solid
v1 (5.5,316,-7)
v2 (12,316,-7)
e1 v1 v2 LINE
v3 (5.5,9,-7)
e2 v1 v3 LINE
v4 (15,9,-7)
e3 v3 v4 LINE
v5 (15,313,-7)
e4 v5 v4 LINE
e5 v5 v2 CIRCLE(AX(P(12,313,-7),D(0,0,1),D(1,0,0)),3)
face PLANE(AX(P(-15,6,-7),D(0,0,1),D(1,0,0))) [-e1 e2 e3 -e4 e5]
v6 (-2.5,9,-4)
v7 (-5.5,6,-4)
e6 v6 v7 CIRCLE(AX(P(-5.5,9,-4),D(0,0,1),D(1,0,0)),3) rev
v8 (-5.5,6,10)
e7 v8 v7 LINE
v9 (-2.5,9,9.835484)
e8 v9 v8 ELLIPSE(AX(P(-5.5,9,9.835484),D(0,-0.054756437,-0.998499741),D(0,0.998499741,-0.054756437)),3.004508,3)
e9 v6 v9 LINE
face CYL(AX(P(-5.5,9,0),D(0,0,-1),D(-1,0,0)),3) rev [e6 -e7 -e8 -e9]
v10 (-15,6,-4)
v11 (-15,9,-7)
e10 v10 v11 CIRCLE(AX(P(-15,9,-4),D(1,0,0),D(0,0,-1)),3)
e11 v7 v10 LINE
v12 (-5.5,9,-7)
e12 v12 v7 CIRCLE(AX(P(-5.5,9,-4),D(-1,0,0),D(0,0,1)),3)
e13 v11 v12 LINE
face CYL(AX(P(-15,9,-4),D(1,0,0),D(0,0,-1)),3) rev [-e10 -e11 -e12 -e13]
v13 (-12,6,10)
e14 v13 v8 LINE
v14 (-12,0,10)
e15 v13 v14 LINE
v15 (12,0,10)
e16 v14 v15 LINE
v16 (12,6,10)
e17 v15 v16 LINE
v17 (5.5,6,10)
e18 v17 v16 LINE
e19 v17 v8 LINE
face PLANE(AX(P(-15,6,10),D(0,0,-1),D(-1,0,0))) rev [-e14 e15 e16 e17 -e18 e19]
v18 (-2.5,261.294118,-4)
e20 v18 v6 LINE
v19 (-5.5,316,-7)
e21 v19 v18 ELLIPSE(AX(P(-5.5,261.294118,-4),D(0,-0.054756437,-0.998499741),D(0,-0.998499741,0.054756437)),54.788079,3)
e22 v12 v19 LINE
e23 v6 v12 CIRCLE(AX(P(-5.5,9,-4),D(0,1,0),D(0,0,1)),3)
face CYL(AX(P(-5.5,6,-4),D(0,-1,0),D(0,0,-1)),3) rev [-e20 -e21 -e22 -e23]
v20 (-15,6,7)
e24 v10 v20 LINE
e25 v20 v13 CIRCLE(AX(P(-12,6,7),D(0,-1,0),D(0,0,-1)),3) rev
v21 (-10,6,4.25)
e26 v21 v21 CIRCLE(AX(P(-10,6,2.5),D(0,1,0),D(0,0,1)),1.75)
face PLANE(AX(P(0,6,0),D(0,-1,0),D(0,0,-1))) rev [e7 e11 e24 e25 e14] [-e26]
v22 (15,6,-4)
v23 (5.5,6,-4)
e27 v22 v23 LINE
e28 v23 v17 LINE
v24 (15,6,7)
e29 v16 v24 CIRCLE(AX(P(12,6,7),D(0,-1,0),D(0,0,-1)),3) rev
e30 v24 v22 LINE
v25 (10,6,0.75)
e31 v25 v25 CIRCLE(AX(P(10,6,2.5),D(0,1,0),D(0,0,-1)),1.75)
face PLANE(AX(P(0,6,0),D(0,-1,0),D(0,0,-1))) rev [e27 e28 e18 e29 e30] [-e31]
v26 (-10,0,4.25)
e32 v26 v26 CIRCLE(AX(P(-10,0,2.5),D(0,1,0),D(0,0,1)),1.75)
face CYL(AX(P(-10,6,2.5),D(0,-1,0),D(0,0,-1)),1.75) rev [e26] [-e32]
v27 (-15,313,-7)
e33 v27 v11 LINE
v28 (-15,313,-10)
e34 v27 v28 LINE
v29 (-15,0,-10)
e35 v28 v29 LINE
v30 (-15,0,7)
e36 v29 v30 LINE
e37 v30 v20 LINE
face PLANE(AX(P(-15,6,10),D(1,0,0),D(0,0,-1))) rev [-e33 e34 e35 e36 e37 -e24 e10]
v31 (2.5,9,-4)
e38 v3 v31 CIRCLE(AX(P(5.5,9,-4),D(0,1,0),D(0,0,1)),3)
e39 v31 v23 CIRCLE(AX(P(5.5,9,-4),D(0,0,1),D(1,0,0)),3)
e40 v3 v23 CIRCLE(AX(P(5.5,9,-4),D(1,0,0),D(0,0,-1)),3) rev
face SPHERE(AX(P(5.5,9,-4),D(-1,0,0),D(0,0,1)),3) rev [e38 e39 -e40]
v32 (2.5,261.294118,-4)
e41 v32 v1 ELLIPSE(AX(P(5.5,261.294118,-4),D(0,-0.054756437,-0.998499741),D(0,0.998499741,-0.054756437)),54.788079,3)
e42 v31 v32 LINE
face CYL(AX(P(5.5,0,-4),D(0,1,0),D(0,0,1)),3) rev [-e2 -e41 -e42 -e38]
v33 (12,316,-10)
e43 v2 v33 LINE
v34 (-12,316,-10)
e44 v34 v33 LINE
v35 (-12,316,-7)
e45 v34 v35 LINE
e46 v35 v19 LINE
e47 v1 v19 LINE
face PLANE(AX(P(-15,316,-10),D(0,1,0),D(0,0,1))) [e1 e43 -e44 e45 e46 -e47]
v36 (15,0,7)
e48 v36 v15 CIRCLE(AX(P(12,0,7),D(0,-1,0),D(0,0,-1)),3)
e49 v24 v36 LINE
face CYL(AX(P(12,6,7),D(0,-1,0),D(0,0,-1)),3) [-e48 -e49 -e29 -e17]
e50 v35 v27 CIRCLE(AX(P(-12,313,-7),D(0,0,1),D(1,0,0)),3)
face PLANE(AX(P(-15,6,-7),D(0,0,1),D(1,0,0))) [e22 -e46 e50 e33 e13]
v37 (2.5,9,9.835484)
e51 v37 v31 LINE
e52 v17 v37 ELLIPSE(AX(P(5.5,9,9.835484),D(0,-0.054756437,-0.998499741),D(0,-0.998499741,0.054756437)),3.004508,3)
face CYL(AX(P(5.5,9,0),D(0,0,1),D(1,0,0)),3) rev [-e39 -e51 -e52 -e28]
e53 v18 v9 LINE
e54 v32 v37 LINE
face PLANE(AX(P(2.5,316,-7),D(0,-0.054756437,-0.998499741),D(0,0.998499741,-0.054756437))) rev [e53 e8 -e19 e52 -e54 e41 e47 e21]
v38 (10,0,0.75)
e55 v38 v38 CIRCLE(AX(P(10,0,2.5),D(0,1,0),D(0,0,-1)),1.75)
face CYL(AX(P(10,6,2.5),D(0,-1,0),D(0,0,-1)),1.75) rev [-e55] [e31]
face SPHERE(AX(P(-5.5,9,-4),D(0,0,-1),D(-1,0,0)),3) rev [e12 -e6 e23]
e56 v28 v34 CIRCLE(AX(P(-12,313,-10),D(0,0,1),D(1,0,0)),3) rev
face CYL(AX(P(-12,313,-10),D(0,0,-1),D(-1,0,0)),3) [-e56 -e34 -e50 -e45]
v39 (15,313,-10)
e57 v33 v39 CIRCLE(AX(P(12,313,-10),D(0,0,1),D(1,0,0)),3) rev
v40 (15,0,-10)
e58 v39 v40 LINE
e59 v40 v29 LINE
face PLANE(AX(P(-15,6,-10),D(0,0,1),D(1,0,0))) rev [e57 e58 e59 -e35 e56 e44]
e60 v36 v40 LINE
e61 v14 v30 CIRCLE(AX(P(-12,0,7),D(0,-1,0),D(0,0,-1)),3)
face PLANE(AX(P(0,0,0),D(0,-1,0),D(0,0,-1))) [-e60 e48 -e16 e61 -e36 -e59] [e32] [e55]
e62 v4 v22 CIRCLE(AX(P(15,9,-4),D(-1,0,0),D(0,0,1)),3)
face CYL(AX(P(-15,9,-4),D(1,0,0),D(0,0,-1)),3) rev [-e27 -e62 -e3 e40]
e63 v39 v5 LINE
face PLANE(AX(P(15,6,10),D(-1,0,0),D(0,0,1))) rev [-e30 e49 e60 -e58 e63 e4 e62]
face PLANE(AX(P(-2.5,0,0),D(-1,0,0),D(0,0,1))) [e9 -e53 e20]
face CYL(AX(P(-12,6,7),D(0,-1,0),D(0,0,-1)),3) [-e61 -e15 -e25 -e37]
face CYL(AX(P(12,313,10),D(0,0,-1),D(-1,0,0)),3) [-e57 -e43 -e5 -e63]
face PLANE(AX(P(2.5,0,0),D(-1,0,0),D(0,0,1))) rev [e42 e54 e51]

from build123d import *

# Parameters (mm, degrees)
SKETCH_1_W      = 30
SKETCH_1_H      = 20
SKETCH_1_R      = 1.75
EXTRUDE_1_DEPTH = 6
SKETCH_2_W      = 3
SKETCH_2_H      = 310
EXTRUDE_2_DEPTH = 30
EXTRUDE_3_DEPTH = 2.5
FILLET_1_R      = 3


with BuildPart() as part:
    # 草图1 → 凸台-拉伸1 (new body)
    with BuildSketch(Plane(origin=(0, 0, 0), x_dir=(1, 0, 0), z_dir=(0, 1, 0))):
        Rectangle(SKETCH_1_W, SKETCH_1_H)
        with Locations(Location((-10, -2.5, 0), (0, 0, 270))):
            Circle(SKETCH_1_R, mode=Mode.SUBTRACT)
        with Locations(Location((10, -2.5, 0), (0, 0, 90))):
            Circle(SKETCH_1_R, mode=Mode.SUBTRACT)
    extrude(amount=EXTRUDE_1_DEPTH)

    # 草图2 → 凸台-拉伸2 (add)
    with BuildSketch(Plane(origin=(15, 0, 0), x_dir=(0, 0, -1), z_dir=(1, 0, 0))):
        with Locations((8.5, 161)):
            Rectangle(SKETCH_2_W, SKETCH_2_H)
    extrude(amount=-EXTRUDE_2_DEPTH)

    # 草图3 → 凸台-拉伸3 (add, symmetric)
    with BuildSketch(Plane(origin=(0, 0, 0), x_dir=(0, 0, -1), z_dir=(1, 0, 0))):
        Polygon((7, 316), (-10, 6), (7, 6), align=None)
    extrude(amount=EXTRUDE_3_DEPTH, both=True)

    # 圆角1
    # the kernel refuses this fillet: 3 mm, written as the material it adds along each edge
    with BuildSketch(Plane(origin=(-5.5, 9, -4), x_dir=(0, -1, 0), z_dir=(0, 0, -1))) as fillet_1_piece_1_section:
        Polygon((0, 0), (FILLET_1_R, 0), (FILLET_1_R, -FILLET_1_R), (0, -FILLET_1_R), align=None)
    fillet_1_piece_1 = extrude(amount=FILLET_1_R, mode=Mode.PRIVATE)
    fillet_1_piece_1 = fillet_1_piece_1 - Plane(origin=(-5.5, 9, -4), x_dir=(-0.7071067811865475, 0.7071067811865475, 0), z_dir=(0, 0, -1)) * Sphere(FILLET_1_R, mode=Mode.PRIVATE)
    add(fillet_1_piece_1)
    with BuildSketch(Plane(origin=(5.5, 9, -4), x_dir=(0, -1, 0), z_dir=(0, 0, -1))) as fillet_1_piece_2_section:
        Polygon((0, 0), (FILLET_1_R, 0), (FILLET_1_R, FILLET_1_R), (0, FILLET_1_R), align=None)
    fillet_1_piece_2 = extrude(amount=FILLET_1_R, mode=Mode.PRIVATE)
    fillet_1_piece_2 = fillet_1_piece_2 - Plane(origin=(5.5, 9, -4), x_dir=(0.7071067811865475, 0.7071067811865475, 0), z_dir=(0, 0, -1)) * Sphere(FILLET_1_R, mode=Mode.PRIVATE)
    add(fillet_1_piece_2)
    with BuildSketch(Plane(origin=(-5.5, 6, -7), x_dir=(0, 0, 1), z_dir=(-1, 0, 0)), Plane(origin=(15, 6, -7), x_dir=(0, 0, 1), z_dir=(-1, 0, 0))) as fillet_1_piece_3:
        with BuildLine():
            CenterArc((FILLET_1_R, FILLET_1_R), FILLET_1_R, 180, 90)
            Line((0, FILLET_1_R), (0, 0))
            Line((0, 0), (FILLET_1_R, 0))
        make_face()
    extrude(amount=9.5)
    with BuildSketch(Plane(origin=(-2.5, 9, -7), x_dir=(-1, 0, 0), z_dir=(0, 1, 0))) as fillet_1_piece_4_section:
        with BuildLine():
            CenterArc((FILLET_1_R, FILLET_1_R), FILLET_1_R, 180, 90)
            Line((0, FILLET_1_R), (0, 0))
            Line((0, 0), (FILLET_1_R, 0))
        make_face()
    fillet_1_piece_4 = extrude(amount=307, mode=Mode.PRIVATE)
    fillet_1_piece_4 = split(fillet_1_piece_4, bisect_by=Plane(origin=(-3.194365112, 156.962181191, 1.721428773), z_dir=(0, -0.054756437403794746, -0.9984997408927277)), keep=Keep.TOP, mode=Mode.PRIVATE)
    add(fillet_1_piece_4)
    with BuildSketch(Plane(origin=(-2.5, 6, 10), x_dir=(-1, 0, 0), z_dir=(0, 0, -1))) as fillet_1_piece_5_section:
        with BuildLine():
            CenterArc((FILLET_1_R, FILLET_1_R), FILLET_1_R, 180, 90)
            Line((0, FILLET_1_R), (0, 0))
            Line((0, 0), (FILLET_1_R, 0))
        make_face()
    fillet_1_piece_5 = extrude(amount=14, mode=Mode.PRIVATE)
    fillet_1_piece_5 = split(fillet_1_piece_5, bisect_by=Plane(origin=(-3.180148424, 7.059257164, 9.941911704), z_dir=(0, -0.054756437403794746, -0.9984997408927277)), keep=Keep.TOP, mode=Mode.PRIVATE)
    add(fillet_1_piece_5)
    with BuildSketch(Plane(origin=(2.5, 9, -7), x_dir=(1, 0, 0), z_dir=(0, 1, 0))) as fillet_1_piece_6_section:
        with BuildLine():
            CenterArc((FILLET_1_R, -FILLET_1_R), FILLET_1_R, 90, 90)
            Line((0, -FILLET_1_R), (0, 0))
            Line((0, 0), (FILLET_1_R, 0))
        make_face()
    fillet_1_piece_6 = extrude(amount=307, mode=Mode.PRIVATE)
    fillet_1_piece_6 = split(fillet_1_piece_6, bisect_by=Plane(origin=(3.194365112, 156.962181191, 1.721428773), z_dir=(0, -0.054756437403794746, -0.9984997408927277)), keep=Keep.TOP, mode=Mode.PRIVATE)
    add(fillet_1_piece_6)
    with BuildSketch(Plane(origin=(2.5, 6, 10), x_dir=(1, 0, 0), z_dir=(0, 0, -1))) as fillet_1_piece_7_section:
        with BuildLine():
            CenterArc((FILLET_1_R, -FILLET_1_R), FILLET_1_R, 90, 90)
            Line((0, -FILLET_1_R), (0, 0))
            Line((0, 0), (FILLET_1_R, 0))
        make_face()
    fillet_1_piece_7 = extrude(amount=14, mode=Mode.PRIVATE)
    fillet_1_piece_7 = split(fillet_1_piece_7, bisect_by=Plane(origin=(3.180148424, 7.059257164, 9.941911704), z_dir=(0, -0.054756437403794746, -0.9984997408927277)), keep=Keep.TOP, mode=Mode.PRIVATE)
    add(fillet_1_piece_7)
    # the kernel refuses this fillet: 3 mm, written as the material it takes off along each edge
    with BuildSketch(Plane(origin=(-15, 316, 0.5), x_dir=(1, 0, 0), z_dir=(0, 0, -1))) as fillet_1_2_piece_1:
        with BuildLine():
            CenterArc((FILLET_1_R, FILLET_1_R), FILLET_1_R, 180, 90)
            Line((0, FILLET_1_R), (0, 0))
            Line((0, 0), (FILLET_1_R, 0))
        make_face()
    extrude(amount=18, mode=Mode.SUBTRACT)
    with BuildSketch(Plane(origin=(15, 316, 0.5), x_dir=(-1, 0, 0), z_dir=(0, 0, -1))) as fillet_1_2_piece_2:
        with BuildLine():
            CenterArc((FILLET_1_R, -FILLET_1_R), FILLET_1_R, 90, 90)
            Line((0, -FILLET_1_R), (0, 0))
            Line((0, 0), (FILLET_1_R, 0))
        make_face()
    extrude(amount=18, mode=Mode.SUBTRACT)
    with BuildSketch(Plane(origin=(15, -7.5, 10), x_dir=(-1, 0, 0), z_dir=(0, 1, 0))) as fillet_1_2_piece_3:
        with BuildLine():
            CenterArc((FILLET_1_R, -FILLET_1_R), FILLET_1_R, 90, 90)
            Line((0, -FILLET_1_R), (0, 0))
            Line((0, 0), (FILLET_1_R, 0))
        make_face()
    extrude(amount=21, mode=Mode.SUBTRACT)
    with BuildSketch(Plane(origin=(-15, -7.5, 10), x_dir=(1, 0, 0), z_dir=(0, 1, 0))) as fillet_1_2_piece_4:
        with BuildLine():
            CenterArc((FILLET_1_R, FILLET_1_R), FILLET_1_R, 180, 90)
            Line((0, FILLET_1_R), (0, 0))
            Line((0, 0), (FILLET_1_R, 0))
        make_face()
    extrude(amount=21, mode=Mode.SUBTRACT)


solid = part.part
